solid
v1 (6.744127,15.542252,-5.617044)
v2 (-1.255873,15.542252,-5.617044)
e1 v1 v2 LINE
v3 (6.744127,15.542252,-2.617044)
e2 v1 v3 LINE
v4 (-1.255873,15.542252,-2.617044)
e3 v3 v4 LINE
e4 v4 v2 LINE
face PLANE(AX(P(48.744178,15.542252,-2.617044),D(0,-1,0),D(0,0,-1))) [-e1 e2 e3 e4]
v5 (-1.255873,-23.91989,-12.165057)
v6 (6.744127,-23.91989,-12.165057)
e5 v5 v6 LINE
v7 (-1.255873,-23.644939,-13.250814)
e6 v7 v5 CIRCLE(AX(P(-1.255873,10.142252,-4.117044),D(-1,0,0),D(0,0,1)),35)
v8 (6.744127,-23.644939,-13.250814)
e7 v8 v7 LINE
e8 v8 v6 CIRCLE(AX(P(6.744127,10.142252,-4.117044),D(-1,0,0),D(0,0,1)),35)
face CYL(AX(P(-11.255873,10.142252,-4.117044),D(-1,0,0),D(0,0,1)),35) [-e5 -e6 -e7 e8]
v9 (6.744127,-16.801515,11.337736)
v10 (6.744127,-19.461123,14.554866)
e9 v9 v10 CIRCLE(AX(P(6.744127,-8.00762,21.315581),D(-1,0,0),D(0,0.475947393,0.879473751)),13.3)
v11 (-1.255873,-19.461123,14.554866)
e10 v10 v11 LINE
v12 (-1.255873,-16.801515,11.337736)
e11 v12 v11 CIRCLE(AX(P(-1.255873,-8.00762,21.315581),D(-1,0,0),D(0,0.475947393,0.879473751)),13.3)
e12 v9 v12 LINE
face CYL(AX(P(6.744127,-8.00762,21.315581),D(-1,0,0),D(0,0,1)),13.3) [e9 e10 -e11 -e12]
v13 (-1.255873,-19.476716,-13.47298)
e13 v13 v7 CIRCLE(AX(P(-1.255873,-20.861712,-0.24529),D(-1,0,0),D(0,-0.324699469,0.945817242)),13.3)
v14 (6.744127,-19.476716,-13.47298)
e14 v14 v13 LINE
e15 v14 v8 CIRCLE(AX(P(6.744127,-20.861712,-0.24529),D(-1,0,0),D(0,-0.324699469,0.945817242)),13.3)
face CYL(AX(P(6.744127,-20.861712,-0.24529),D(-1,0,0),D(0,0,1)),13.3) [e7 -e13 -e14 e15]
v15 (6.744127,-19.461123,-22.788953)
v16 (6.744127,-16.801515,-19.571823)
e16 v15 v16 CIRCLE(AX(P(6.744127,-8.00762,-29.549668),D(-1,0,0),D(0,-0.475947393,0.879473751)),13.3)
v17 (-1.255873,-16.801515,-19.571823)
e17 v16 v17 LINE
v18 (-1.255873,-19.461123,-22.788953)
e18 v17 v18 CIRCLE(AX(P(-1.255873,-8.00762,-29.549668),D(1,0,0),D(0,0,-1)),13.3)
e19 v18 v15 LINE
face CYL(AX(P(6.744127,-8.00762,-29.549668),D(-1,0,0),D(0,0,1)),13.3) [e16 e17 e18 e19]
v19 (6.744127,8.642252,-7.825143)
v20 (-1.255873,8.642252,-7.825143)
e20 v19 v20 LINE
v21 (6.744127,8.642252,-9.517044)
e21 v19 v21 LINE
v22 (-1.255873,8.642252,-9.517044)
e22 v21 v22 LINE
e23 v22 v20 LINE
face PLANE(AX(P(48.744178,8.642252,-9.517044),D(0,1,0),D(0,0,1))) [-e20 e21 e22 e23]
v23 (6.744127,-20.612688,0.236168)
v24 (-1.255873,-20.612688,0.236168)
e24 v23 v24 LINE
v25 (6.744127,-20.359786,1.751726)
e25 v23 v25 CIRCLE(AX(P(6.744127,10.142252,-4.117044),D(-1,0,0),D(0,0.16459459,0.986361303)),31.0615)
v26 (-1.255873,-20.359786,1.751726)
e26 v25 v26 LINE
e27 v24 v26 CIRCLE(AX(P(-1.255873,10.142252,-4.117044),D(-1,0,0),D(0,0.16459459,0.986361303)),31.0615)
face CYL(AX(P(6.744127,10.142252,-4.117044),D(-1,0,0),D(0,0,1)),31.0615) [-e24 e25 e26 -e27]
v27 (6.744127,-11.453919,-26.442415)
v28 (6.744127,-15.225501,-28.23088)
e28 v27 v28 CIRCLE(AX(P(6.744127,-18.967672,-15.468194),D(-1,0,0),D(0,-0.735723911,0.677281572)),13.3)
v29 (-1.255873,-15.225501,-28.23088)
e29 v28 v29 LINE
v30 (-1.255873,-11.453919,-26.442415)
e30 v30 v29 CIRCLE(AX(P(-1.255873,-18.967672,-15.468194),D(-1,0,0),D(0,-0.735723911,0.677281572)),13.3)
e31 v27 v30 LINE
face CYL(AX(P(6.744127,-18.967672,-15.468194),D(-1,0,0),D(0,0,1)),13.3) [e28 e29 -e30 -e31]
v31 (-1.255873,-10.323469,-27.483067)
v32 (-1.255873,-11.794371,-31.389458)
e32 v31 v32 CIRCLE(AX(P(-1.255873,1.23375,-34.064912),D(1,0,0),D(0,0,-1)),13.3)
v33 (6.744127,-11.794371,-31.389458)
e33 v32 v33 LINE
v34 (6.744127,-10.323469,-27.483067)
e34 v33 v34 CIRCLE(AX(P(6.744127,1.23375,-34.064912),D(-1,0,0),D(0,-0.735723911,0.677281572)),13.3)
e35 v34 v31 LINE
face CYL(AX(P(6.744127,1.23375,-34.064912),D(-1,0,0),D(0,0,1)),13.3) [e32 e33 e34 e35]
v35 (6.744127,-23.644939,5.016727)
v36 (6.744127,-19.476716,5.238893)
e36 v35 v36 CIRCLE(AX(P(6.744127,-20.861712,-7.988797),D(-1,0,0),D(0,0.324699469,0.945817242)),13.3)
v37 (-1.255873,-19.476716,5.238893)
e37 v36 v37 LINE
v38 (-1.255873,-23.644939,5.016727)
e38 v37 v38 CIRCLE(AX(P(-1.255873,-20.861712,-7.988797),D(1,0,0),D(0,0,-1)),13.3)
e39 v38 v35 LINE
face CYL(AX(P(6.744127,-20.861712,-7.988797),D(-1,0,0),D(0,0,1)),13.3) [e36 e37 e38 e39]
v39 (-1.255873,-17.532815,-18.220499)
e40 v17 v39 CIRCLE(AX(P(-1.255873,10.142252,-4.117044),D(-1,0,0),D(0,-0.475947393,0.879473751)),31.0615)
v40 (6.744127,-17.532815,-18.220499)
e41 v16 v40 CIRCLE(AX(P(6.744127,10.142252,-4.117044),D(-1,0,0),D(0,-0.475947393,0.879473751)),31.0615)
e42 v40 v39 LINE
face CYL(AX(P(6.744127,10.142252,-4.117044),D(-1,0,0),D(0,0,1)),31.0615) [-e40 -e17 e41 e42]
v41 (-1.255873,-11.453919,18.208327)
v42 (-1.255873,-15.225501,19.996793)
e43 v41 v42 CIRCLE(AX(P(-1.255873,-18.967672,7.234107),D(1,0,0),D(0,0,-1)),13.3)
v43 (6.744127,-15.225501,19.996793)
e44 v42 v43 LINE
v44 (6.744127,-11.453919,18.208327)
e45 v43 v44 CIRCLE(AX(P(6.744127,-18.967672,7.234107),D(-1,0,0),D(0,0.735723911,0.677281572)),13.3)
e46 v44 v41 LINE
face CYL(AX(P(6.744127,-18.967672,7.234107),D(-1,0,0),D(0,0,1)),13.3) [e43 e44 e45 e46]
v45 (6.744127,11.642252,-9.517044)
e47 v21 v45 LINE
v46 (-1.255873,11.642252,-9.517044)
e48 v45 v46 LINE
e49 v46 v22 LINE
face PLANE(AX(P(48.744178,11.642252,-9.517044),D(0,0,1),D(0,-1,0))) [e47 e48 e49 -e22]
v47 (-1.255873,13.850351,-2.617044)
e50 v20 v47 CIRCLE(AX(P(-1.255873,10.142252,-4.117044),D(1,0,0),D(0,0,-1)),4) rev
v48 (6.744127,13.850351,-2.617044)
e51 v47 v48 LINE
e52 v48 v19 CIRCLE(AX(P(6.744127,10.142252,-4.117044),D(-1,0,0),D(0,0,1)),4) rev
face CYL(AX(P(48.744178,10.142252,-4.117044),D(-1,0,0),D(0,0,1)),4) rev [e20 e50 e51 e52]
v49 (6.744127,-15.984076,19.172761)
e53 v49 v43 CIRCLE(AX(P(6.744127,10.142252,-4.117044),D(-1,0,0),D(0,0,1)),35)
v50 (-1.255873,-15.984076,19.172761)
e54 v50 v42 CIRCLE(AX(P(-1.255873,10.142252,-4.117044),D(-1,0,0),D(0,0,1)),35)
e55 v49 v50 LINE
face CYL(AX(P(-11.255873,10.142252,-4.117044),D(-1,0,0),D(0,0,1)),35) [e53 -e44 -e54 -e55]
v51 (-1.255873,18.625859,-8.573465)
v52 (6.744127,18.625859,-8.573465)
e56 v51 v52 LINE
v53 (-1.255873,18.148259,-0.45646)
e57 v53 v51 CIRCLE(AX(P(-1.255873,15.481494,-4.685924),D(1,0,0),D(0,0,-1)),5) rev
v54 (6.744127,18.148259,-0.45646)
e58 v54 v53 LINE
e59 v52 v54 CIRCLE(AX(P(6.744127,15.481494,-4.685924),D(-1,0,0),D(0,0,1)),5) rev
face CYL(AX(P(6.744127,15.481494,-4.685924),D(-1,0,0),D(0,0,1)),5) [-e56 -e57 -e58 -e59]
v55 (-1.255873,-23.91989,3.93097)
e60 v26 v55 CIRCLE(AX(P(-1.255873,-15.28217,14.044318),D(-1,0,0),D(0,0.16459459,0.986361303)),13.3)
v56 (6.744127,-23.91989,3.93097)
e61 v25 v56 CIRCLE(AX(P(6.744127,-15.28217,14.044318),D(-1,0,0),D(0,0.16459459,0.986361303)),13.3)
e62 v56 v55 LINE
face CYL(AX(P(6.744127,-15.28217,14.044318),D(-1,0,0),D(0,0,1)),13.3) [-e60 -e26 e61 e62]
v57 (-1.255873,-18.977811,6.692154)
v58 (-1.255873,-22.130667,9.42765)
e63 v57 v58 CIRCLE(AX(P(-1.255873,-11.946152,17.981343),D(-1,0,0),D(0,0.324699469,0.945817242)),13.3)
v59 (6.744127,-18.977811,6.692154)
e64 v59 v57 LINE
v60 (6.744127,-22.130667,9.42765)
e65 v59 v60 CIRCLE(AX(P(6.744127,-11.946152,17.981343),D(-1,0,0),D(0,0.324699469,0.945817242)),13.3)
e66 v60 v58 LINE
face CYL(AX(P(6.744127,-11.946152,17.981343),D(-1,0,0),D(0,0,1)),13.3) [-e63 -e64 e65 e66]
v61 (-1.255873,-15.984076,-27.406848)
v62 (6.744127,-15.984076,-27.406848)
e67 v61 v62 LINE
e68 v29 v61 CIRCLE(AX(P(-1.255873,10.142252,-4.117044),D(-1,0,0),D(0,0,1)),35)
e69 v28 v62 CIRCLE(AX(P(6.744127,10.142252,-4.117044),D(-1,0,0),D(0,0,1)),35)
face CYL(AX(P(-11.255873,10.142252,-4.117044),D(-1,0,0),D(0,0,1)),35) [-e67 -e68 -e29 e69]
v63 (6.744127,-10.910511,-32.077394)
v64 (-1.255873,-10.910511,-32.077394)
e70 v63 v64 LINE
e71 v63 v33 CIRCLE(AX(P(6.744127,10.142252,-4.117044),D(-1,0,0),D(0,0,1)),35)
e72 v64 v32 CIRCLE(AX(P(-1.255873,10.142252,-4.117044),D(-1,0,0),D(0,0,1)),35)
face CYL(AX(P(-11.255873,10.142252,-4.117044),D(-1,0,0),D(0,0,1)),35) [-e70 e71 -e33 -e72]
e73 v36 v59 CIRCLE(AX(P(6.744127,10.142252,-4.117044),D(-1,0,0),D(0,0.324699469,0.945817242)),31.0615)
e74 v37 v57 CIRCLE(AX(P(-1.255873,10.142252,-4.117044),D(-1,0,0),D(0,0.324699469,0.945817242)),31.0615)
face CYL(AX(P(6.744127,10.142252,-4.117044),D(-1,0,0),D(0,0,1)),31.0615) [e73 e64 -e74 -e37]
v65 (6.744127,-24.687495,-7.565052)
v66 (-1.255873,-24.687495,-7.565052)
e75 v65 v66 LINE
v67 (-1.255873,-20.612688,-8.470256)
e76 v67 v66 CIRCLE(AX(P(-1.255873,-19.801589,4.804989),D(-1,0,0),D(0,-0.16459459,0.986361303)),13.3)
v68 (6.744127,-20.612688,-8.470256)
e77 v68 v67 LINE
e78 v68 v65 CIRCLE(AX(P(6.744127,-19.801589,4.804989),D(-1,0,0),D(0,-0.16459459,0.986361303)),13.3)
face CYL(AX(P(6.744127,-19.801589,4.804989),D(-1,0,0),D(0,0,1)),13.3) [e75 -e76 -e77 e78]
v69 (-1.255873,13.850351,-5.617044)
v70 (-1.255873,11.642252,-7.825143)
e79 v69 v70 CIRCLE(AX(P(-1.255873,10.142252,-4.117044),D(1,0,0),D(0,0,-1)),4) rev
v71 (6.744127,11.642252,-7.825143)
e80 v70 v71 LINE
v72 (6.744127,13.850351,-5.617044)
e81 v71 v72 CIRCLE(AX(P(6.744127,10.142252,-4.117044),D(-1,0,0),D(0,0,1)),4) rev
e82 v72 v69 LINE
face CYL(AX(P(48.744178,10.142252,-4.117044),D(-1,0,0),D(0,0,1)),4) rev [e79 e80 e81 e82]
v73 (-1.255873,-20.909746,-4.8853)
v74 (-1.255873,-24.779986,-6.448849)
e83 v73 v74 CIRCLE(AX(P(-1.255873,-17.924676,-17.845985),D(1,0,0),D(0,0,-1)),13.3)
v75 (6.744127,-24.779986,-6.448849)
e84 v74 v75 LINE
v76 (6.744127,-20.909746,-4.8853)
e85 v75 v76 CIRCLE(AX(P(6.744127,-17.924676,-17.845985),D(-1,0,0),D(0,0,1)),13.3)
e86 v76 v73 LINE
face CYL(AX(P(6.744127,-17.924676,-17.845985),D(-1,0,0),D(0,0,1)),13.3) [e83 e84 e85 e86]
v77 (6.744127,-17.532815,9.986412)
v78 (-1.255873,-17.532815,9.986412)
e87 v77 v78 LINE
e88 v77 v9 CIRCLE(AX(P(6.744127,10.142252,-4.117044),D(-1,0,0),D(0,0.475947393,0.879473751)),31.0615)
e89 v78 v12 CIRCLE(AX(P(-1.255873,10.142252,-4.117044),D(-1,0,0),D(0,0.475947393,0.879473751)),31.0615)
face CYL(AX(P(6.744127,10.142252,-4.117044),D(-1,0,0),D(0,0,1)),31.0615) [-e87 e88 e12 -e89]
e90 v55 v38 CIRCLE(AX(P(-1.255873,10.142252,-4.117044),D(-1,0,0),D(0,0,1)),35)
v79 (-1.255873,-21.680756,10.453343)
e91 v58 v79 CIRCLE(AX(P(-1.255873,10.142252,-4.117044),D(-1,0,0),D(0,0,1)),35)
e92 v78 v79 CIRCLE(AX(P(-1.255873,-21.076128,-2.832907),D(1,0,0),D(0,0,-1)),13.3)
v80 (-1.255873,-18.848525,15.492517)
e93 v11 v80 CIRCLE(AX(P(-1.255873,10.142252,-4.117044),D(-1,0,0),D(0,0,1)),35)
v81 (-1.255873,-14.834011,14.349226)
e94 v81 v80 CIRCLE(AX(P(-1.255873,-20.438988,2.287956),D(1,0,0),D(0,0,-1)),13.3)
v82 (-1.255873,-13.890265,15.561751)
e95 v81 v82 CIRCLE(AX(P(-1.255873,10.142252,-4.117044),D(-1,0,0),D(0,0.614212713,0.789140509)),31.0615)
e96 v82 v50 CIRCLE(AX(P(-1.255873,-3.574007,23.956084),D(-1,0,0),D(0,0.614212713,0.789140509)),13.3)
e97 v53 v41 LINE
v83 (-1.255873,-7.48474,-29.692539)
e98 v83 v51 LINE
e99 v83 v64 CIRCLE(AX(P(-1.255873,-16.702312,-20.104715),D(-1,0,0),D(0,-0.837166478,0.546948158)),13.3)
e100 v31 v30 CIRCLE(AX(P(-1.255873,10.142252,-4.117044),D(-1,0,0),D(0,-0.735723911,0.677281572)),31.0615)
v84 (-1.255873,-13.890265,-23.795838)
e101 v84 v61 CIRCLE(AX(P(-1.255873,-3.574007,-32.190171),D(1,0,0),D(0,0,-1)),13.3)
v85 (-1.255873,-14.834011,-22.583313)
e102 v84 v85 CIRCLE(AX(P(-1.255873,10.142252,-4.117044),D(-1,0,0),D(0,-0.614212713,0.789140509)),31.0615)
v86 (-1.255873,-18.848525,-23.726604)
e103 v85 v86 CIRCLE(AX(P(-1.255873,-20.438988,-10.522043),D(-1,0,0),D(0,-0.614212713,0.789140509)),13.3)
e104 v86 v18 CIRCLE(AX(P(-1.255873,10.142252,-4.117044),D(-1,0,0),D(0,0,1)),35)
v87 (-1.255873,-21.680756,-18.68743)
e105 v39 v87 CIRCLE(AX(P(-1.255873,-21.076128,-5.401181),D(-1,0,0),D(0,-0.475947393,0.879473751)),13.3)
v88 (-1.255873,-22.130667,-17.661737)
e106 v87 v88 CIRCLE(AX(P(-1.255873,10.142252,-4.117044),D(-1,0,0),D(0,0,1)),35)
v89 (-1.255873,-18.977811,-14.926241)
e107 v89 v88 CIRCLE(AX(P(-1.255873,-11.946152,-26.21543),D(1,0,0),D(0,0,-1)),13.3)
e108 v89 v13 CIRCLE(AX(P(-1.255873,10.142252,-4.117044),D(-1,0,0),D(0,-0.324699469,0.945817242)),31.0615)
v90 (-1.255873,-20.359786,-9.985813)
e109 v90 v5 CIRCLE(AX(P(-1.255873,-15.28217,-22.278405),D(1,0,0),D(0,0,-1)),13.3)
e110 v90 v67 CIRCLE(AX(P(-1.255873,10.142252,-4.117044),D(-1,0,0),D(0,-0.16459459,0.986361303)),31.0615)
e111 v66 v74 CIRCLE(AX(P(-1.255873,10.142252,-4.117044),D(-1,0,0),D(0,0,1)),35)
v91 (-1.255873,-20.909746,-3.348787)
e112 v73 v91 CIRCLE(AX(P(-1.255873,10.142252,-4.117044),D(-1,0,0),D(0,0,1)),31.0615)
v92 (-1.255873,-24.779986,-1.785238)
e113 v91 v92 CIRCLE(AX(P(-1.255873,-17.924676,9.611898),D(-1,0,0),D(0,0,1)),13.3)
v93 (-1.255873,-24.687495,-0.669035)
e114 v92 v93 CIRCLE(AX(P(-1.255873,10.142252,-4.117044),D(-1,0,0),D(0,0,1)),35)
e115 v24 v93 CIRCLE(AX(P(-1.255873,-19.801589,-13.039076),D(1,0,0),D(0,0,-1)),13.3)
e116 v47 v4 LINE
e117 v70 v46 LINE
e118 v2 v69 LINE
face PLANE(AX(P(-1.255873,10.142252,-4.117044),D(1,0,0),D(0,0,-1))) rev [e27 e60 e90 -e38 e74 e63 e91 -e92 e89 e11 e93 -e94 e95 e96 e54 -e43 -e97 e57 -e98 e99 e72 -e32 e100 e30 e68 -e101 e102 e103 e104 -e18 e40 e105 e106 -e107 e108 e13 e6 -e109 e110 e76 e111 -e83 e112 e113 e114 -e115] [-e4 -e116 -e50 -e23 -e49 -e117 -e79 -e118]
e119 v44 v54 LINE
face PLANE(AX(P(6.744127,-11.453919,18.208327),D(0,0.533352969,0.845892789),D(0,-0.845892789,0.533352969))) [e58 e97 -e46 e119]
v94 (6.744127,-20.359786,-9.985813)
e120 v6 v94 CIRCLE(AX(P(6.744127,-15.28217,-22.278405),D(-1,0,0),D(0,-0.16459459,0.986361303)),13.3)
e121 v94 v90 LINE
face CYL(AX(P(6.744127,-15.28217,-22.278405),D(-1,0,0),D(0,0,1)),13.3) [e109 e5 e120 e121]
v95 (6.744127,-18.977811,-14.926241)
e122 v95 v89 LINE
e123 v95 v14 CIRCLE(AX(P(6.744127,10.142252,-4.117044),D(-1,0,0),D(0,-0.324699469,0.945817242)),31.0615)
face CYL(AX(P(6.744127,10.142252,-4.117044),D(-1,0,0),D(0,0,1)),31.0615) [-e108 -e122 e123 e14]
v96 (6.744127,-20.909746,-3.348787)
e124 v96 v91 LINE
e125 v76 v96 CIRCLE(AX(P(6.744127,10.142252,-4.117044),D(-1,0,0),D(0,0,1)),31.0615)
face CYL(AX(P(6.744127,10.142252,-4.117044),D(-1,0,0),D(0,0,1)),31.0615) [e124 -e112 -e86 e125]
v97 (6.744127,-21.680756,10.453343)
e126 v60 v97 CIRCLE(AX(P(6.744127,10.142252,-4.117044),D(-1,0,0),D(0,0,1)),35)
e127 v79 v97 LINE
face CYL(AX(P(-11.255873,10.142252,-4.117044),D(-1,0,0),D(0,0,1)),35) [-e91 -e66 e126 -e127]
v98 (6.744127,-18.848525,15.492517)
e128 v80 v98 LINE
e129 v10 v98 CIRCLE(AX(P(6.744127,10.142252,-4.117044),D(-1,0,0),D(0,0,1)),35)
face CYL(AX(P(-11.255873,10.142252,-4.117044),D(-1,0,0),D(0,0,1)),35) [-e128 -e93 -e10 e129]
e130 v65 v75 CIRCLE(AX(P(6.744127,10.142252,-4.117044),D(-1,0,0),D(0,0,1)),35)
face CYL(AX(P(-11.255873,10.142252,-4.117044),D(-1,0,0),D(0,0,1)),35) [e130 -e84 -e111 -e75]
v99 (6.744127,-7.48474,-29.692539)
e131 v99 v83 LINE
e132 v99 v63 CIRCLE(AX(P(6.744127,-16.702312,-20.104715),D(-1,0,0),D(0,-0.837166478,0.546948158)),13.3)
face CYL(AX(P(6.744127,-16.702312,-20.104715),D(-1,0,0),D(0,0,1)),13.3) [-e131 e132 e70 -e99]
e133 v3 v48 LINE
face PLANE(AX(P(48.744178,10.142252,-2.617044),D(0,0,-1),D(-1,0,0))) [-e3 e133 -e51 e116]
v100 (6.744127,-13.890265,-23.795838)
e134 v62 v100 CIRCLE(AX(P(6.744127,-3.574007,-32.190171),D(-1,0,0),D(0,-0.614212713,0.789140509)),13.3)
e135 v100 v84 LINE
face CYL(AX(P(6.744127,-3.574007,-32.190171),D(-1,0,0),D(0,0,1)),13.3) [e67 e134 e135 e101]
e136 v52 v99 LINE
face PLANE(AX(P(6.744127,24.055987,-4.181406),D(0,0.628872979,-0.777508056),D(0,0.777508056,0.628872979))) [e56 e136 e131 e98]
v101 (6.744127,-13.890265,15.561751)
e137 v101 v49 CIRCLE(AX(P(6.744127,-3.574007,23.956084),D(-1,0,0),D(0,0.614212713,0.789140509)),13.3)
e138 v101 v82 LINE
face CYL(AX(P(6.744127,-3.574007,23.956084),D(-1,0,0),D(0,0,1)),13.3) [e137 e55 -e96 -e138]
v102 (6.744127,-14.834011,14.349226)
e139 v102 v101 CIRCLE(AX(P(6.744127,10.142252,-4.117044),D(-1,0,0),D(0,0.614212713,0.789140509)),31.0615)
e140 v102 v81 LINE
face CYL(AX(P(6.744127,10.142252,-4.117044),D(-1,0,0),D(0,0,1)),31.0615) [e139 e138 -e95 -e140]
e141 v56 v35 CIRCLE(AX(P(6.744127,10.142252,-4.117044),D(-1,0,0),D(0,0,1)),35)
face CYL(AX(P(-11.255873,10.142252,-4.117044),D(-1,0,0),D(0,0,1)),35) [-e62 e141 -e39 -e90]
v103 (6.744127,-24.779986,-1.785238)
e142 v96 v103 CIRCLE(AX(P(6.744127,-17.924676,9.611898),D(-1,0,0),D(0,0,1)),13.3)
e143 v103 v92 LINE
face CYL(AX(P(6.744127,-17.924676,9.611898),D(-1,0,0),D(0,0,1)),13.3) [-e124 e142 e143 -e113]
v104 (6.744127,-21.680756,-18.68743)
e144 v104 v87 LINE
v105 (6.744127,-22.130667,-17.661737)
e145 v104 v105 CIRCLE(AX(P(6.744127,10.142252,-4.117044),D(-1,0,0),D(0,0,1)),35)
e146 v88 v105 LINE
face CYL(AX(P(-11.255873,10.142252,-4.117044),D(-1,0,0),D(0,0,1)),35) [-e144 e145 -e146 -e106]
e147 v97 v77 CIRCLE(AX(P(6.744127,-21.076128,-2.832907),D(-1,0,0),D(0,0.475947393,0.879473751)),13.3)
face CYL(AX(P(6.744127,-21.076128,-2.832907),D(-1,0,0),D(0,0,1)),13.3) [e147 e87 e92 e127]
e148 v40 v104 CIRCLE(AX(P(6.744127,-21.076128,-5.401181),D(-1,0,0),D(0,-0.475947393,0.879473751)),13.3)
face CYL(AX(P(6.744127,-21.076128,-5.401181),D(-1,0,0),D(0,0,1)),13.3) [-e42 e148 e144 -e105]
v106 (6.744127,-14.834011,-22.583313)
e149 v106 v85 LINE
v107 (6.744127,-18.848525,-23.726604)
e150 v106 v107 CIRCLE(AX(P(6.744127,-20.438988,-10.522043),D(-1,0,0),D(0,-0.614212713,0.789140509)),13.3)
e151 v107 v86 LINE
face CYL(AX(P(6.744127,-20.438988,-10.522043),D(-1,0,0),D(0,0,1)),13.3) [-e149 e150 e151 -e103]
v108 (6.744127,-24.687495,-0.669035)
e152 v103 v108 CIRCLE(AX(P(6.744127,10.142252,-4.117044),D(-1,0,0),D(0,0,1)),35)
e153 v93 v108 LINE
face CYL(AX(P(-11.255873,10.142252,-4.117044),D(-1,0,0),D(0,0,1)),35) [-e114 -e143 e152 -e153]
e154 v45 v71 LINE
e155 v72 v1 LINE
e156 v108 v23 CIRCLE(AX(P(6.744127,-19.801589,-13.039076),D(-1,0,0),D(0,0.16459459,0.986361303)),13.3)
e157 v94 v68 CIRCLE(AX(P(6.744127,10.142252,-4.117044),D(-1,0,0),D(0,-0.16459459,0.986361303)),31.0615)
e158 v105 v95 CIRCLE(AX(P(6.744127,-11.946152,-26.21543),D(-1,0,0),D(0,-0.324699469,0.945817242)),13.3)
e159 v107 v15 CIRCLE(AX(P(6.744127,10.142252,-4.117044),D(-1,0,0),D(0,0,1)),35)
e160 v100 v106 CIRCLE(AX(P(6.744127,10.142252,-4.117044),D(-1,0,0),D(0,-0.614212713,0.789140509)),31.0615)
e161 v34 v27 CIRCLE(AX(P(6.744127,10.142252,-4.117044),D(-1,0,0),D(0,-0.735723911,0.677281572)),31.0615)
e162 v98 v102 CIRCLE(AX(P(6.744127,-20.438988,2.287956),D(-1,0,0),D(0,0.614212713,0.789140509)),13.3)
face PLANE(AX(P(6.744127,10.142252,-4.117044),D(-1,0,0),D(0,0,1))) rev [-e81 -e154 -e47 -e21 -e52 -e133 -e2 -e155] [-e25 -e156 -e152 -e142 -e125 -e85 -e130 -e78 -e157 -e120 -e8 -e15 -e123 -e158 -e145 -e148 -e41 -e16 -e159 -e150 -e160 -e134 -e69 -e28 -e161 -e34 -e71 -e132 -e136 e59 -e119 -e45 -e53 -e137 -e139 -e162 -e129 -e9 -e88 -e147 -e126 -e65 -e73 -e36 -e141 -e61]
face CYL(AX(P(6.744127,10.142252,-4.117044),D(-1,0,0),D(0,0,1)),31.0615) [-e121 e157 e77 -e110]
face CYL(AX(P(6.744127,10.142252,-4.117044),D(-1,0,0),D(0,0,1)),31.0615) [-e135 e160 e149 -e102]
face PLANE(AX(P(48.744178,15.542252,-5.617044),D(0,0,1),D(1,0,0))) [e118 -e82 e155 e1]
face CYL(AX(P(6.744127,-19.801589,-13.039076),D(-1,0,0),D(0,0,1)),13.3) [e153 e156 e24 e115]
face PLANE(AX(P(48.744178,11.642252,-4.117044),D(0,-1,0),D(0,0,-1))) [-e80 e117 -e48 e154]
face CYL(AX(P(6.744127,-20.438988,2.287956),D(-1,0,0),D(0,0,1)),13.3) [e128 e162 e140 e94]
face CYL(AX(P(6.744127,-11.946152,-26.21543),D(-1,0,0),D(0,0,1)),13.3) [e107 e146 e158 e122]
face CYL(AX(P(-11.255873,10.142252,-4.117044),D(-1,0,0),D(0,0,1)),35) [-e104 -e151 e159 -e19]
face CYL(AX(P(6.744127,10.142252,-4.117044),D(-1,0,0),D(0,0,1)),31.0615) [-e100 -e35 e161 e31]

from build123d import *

# Parameters (mm, degrees)
SPUR_START          = -1.255872891
SPUR_GEAR_ISO_DEPTH = 8
CUT_EXTRUDE1_START  = -8
CUT_EXTRUDE1_DEPTH  = 8
FILLET1_R           = 5


# Read off the part's stored shape, not the designer's step: spur gear_iso
with BuildPart() as part:
    # spur gear_iso outline → spur gear_iso (new body)
    with BuildSketch(Plane.YZ.offset(SPUR_START)):
        with BuildLine():
            ThreePointArc((10.70226618, 30.878475903), (10.142251627, 30.882956422), (9.582237074, 30.878475903))
            ThreePointArc((9.582237074, 30.878475903), (8.805580488, 28.934301135), (8.343630809, 26.892337993))
            ThreePointArc((8.343630809, 26.892337993), (7.577213288, 26.838365652), (6.812365147, 26.765453703))
            ThreePointArc((6.812365147, 26.765453703), (6.020619773, 28.703532711), (4.934555121, 30.493357996))
            ThreePointArc((4.934555121, 30.493357996), (4.381440967, 30.405602041), (3.829801752, 30.309007264))
            ThreePointArc((3.829801752, 30.309007264), (3.383738399, 28.263515034), (3.264185198, 26.17336719))
            ThreePointArc((3.264185198, 26.17336719), (2.517104168, 25.993982783), (1.774688472, 25.796175391))
            ThreePointArc((1.774688472, 25.796175391), (0.674744152, 27.577504522), (-0.691103553, 29.164158557))
            ThreePointArc((-0.691103553, 29.164158557), (-1.222229795, 28.986559882), (-1.750446392, 28.800485701))
            ThreePointArc((-1.750446392, 28.800485701), (-1.853749067, 26.709471704), (-1.62764469, 24.628152942))
            ThreePointArc((-1.62764469, 24.628152942), (-2.335010805, 24.328249608), (-3.034742893, 24.010942444))
            ThreePointArc((-3.034742893, 24.010942444), (-4.412882545, 25.586931683), (-6.021256538, 26.927134682))
            ThreePointArc((-6.021256538, 26.927134682), (-6.515907129, 26.664537715), (-7.006292737, 26.394059749))
            ThreePointArc((-7.006292737, 26.394059749), (-6.764016906, 24.314561396), (-6.198422489, 22.298844666))
            ThreePointArc((-6.198422489, 22.298844666), (-6.846778586, 21.886602987), (-7.484740198, 21.458451363))
            ThreePointArc((-7.484740198, 21.458451363), (-9.103483124, 22.786111831), (-10.910511155, 23.843306549))
            ThreePointArc((-10.910511155, 23.843306549), (-11.355193317, 23.502874251), (-11.794371494, 23.155370434))
            ThreePointArc((-11.794371494, 23.155370434), (-11.21312581, 21.144111019), (-10.323469295, 19.24897982))
            ThreePointArc((-10.323469295, 19.24897982), (-10.89512991, 18.735644674), (-11.453919115, 18.20832745))
            ThreePointArc((-11.453919115, 18.20832745), (-13.269110228, 19.251444031), (-15.225501284, 19.996792953))
            ThreePointArc((-15.225501284, 19.996792953), (-15.608085246, 19.587811429), (-15.984076358, 19.172760759))
            ThreePointArc((-15.984076358, 19.172760759), (-15.079715688, 17.284602196), (-13.890264584, 15.561750766))
            ThreePointArc((-13.890264584, 15.561750766), (-14.369636305, 14.961324598), (-14.834010792, 14.349225613))
            ThreePointArc((-14.834010792, 14.349225613), (-16.796136411, 15.079344806), (-18.848525243, 15.492516756))
            ThreePointArc((-18.848525243, 15.492516756), (-19.158575112, 15.026141957), (-19.461123099, 14.554865934))
            ThreePointArc((-19.461123099, 14.554865934), (-18.258316045, 12.841312267), (-16.801515479, 11.337735501))
            ThreePointArc((-16.801515479, 11.337735501), (-17.175522296, 10.666596371), (-17.532815138, 9.98641209))
            ThreePointArc((-17.532815138, 9.98641209), (-19.58835359, 10.383618147), (-21.680756382, 10.453342871))
            ThreePointArc((-21.680756382, 10.453342871), (-21.909814806, 9.942296285), (-22.130666949, 9.427650091))
            ThreePointArc((-22.130666949, 9.427650091), (-20.662222952, 7.935442597), (-18.977810645, 6.692154151))
            ThreePointArc((-18.977810645, 6.692154151), (-19.236250626, 5.968608985), (-19.476715807, 5.238893062))
            ThreePointArc((-19.476715807, 5.238893062), (-21.569597361, 5.292351237), (-23.644938818, 5.016726826))
            ThreePointArc((-23.644938818, 5.016726826), (-23.786757681, 4.474948472), (-23.919889709, 3.930970313))
            ThreePointArc((-23.919889709, 3.930970313), (-22.225864093, 2.700812522), (-20.359786422, 1.751726064))
            ThreePointArc((-20.359786422, 1.751726064), (-20.495609998, 0.995511288), (-20.612688254, 0.236168472))
            ThreePointArc((-20.612688254, 0.236168472), (-22.685824559, -0.055579435), (-24.687494776, -0.669034665))
            ThreePointArc((-24.687494776, -0.669034665), (-24.738205628, -1.226766486), (-24.779986047, -1.785238304))
            ThreePointArc((-24.779986047, -1.785238304), (-22.906587414, -2.719790893), (-20.909746114, -3.34878676))
            ThreePointArc((-20.909746114, -3.34878676), (-20.919248373, -4.117043577), (-20.909746114, -4.885300395))
            ThreePointArc((-20.909746114, -4.885300395), (-22.906587414, -5.514296262), (-24.779986047, -6.448848851))
            ThreePointArc((-24.779986047, -6.448848851), (-24.738205628, -7.007320669), (-24.687494776, -7.56505249))
            ThreePointArc((-24.687494776, -7.56505249), (-22.685824559, -8.17850772), (-20.612688254, -8.470255627))
            ThreePointArc((-20.612688254, -8.470255627), (-20.495609998, -9.229598443), (-20.359786422, -9.985813219))
            ThreePointArc((-20.359786422, -9.985813219), (-22.225864092, -10.934899678), (-23.919889709, -12.165057468))
            ThreePointArc((-23.919889709, -12.165057468), (-23.786757681, -12.709035628), (-23.644938818, -13.250813982))
            ThreePointArc((-23.644938818, -13.250813982), (-21.569597361, -13.526438392), (-19.476715807, -13.472980218))
            ThreePointArc((-19.476715807, -13.472980218), (-19.236250626, -14.20269614), (-18.977810645, -14.926241306))
            ThreePointArc((-18.977810645, -14.926241306), (-20.662222952, -16.169529752), (-22.130666949, -17.661737246))
            ThreePointArc((-22.130666949, -17.661737246), (-21.909814806, -18.17638344), (-21.680756382, -18.687430026))
            ThreePointArc((-21.680756382, -18.687430026), (-19.58835359, -18.617705303), (-17.532815138, -18.220499246))
            ThreePointArc((-17.532815138, -18.220499246), (-17.175522296, -18.900683526), (-16.801515479, -19.571822656))
            ThreePointArc((-16.801515479, -19.571822656), (-18.258316045, -21.075399422), (-19.461123099, -22.788953089))
            ThreePointArc((-19.461123099, -22.788953089), (-19.158575112, -23.260229112), (-18.848525243, -23.726603911))
            ThreePointArc((-18.848525243, -23.726603911), (-16.79613641, -23.313431962), (-14.834010792, -22.583312768))
            ThreePointArc((-14.834010792, -22.583312768), (-14.369636305, -23.195411753), (-13.890264584, -23.795837921))
            ThreePointArc((-13.890264584, -23.795837921), (-15.079715688, -25.518689351), (-15.984076358, -27.406847914))
            ThreePointArc((-15.984076358, -27.406847914), (-15.608085247, -27.821898584), (-15.225501284, -28.230880108))
            ThreePointArc((-15.225501284, -28.230880108), (-13.269110228, -27.485531187), (-11.453919115, -26.442414605))
            ThreePointArc((-11.453919115, -26.442414605), (-10.89512991, -26.969731829), (-10.323469295, -27.483066975))
            ThreePointArc((-10.323469295, -27.483066975), (-11.21312581, -29.378198174), (-11.794371494, -31.389457589))
            ThreePointArc((-11.794371494, -31.389457589), (-11.355193317, -31.736961407), (-10.910511155, -32.077393705))
            ThreePointArc((-10.910511155, -32.077393705), (-9.103483124, -31.020198987), (-7.484740198, -29.692538518))
            ThreePointArc((-7.484740198, -29.692538518), (-6.846778586, -30.120690142), (-6.198422489, -30.532931821))
            ThreePointArc((-6.198422489, -30.532931821), (-6.764016906, -32.548648551), (-7.006292737, -34.628146904))
            ThreePointArc((-7.006292737, -34.628146904), (-6.515907129, -34.89862487), (-6.021256538, -35.161221837))
            ThreePointArc((-6.021256538, -35.161221837), (-4.412882545, -33.821018838), (-3.034742893, -32.2450296))
            ThreePointArc((-3.034742893, -32.2450296), (-2.335010806, -32.562336764), (-1.62764469, -32.862240097))
            ThreePointArc((-1.62764469, -32.862240097), (-1.853749067, -34.943558859), (-1.750446392, -37.034572856))
            ThreePointArc((-1.750446392, -37.034572856), (-1.222229795, -37.220647037), (-0.691103553, -37.398245713))
            ThreePointArc((-0.691103553, -37.398245713), (0.674744152, -35.811591678), (1.774688472, -34.030262547))
            ThreePointArc((1.774688472, -34.030262547), (2.517104168, -34.228069938), (3.264185198, -34.407454345))
            ThreePointArc((3.264185198, -34.407454345), (3.383738399, -36.49760219), (3.829801752, -38.54309442))
            ThreePointArc((3.829801752, -38.54309442), (4.381440967, -38.639689197), (4.934555121, -38.727445151))
            ThreePointArc((4.934555121, -38.727445151), (6.020619773, -36.937619866), (6.812365147, -34.999540858))
            ThreePointArc((6.812365147, -34.999540858), (7.577213288, -35.072452807), (8.343630809, -35.126425148))
            ThreePointArc((8.343630809, -35.126425148), (8.805580488, -37.16838829), (9.582237074, -39.112563058))
            ThreePointArc((9.582237074, -39.112563058), (10.142251627, -39.117043578), (10.70226618, -39.112563058))
            ThreePointArc((10.70226618, -39.112563058), (11.478922766, -37.16838829), (11.940872445, -35.126425148))
            ThreePointArc((11.940872445, -35.126425148), (12.707289966, -35.072452807), (13.472138107, -34.999540858))
            ThreePointArc((13.472138107, -34.999540858), (14.263883482, -36.937619866), (15.349948133, -38.727445151))
            ThreePointArc((15.349948133, -38.727445151), (15.903062287, -38.639689197), (16.454701502, -38.54309442))
            ThreePointArc((16.454701502, -38.54309442), (16.900764855, -36.49760219), (17.020318056, -34.407454345))
            ThreePointArc((17.020318056, -34.407454345), (17.767399086, -34.228069938), (18.509814783, -34.030262547))
            ThreePointArc((18.509814783, -34.030262547), (19.609759102, -35.811591678), (20.975606807, -37.398245713))
            ThreePointArc((20.975606807, -37.398245713), (21.506733049, -37.220647037), (22.034949647, -37.034572856))
            ThreePointArc((22.034949647, -37.034572856), (22.138252321, -34.943558859), (21.912147944, -32.862240097))
            ThreePointArc((21.912147944, -32.862240097), (22.61951406, -32.562336764), (23.319246148, -32.2450296))
            ThreePointArc((23.319246148, -32.2450296), (24.697385799, -33.821018838), (26.305759792, -35.161221837))
            ThreePointArc((26.305759792, -35.161221837), (26.800410383, -34.89862487), (27.290795991, -34.628146904))
            ThreePointArc((27.290795991, -34.628146904), (27.04852016, -32.548648551), (26.482925743, -30.532931821))
            ThreePointArc((26.482925743, -30.532931821), (27.131281841, -30.120690142), (27.769243452, -29.692538518))
            ThreePointArc((27.769243452, -29.692538518), (29.387986378, -31.020198987), (31.19501441, -32.077393705))
            ThreePointArc((31.19501441, -32.077393705), (31.639696572, -31.736961407), (32.078874749, -31.389457589))
            ThreePointArc((32.078874749, -31.389457589), (31.497629065, -29.378198174), (30.607972549, -27.483066975))
            ThreePointArc((30.607972549, -27.483066975), (31.179633164, -26.969731829), (31.73842237, -26.442414605))
            ThreePointArc((31.73842237, -26.442414605), (33.553613483, -27.485531187), (35.510004539, -28.230880108))
            ThreePointArc((35.510004539, -28.230880108), (35.892588501, -27.821898585), (36.268579612, -27.406847914))
            ThreePointArc((36.268579612, -27.406847914), (35.364218942, -25.518689351), (34.174767838, -23.795837921))
            ThreePointArc((34.174767838, -23.795837921), (34.65413956, -23.195411753), (35.118514046, -22.583312768))
            ThreePointArc((35.118514046, -22.583312768), (37.080639664, -23.313431962), (39.133028497, -23.726603911))
            ThreePointArc((39.133028497, -23.726603911), (39.443078366, -23.260229112), (39.745626354, -22.788953089))
            ThreePointArc((39.745626354, -22.788953089), (38.5428193, -21.075399422), (37.086018733, -19.571822656))
            ThreePointArc((37.086018733, -19.571822656), (37.46002555, -18.900683526), (37.817318393, -18.220499246))
            ThreePointArc((37.817318393, -18.220499246), (39.872856845, -18.617705303), (41.965259636, -18.687430026))
            ThreePointArc((41.965259636, -18.687430026), (42.19431806, -18.17638344), (42.415170203, -17.661737246))
            ThreePointArc((42.415170203, -17.661737246), (40.946726206, -16.169529752), (39.262313899, -14.926241306))
            ThreePointArc((39.262313899, -14.926241306), (39.52075388, -14.20269614), (39.761219061, -13.472980218))
            ThreePointArc((39.761219061, -13.472980218), (41.854100616, -13.526438392), (43.929442073, -13.250813982))
            ThreePointArc((43.929442073, -13.250813982), (44.071260935, -12.709035628), (44.204392963, -12.165057468))
            ThreePointArc((44.204392963, -12.165057468), (42.510367346, -10.934899678), (40.644289676, -9.985813219))
            ThreePointArc((40.644289676, -9.985813219), (40.780113253, -9.229598444), (40.897191508, -8.470255627))
            ThreePointArc((40.897191508, -8.470255627), (42.970327813, -8.17850772), (44.971998031, -7.56505249))
            ThreePointArc((44.971998031, -7.56505249), (45.022708882, -7.007320669), (45.064489301, -6.448848851))
            ThreePointArc((45.064489301, -6.448848851), (43.191090668, -5.514296262), (41.194249368, -4.885300395))
            ThreePointArc((41.194249368, -4.885300395), (41.203751627, -4.117043577), (41.194249368, -3.34878676))
            ThreePointArc((41.194249368, -3.34878676), (43.191090668, -2.719790893), (45.064489301, -1.785238304))
            ThreePointArc((45.064489301, -1.785238304), (45.022708882, -1.226766486), (44.971998031, -0.669034665))
            ThreePointArc((44.971998031, -0.669034665), (42.970327813, -0.055579435), (40.897191508, 0.236168472))
            ThreePointArc((40.897191508, 0.236168472), (40.780113253, 0.995511288), (40.644289676, 1.751726064))
            ThreePointArc((40.644289676, 1.751726064), (42.510367347, 2.700812522), (44.204392963, 3.930970313))
            ThreePointArc((44.204392963, 3.930970313), (44.071260935, 4.474948472), (43.929442073, 5.016726826))
            ThreePointArc((43.929442073, 5.016726826), (41.854100616, 5.292351237), (39.761219061, 5.238893062))
            ThreePointArc((39.761219061, 5.238893062), (39.52075388, 5.968608985), (39.262313899, 6.692154151))
            ThreePointArc((39.262313899, 6.692154151), (40.946726206, 7.935442597), (42.415170203, 9.427650091))
            ThreePointArc((42.415170203, 9.427650091), (42.19431806, 9.942296285), (41.965259636, 10.453342871))
            ThreePointArc((41.965259636, 10.453342871), (39.872856845, 10.383618147), (37.817318393, 9.98641209))
            ThreePointArc((37.817318393, 9.98641209), (37.46002555, 10.666596371), (37.086018733, 11.337735501))
            ThreePointArc((37.086018733, 11.337735501), (38.5428193, 12.841312267), (39.745626354, 14.554865934))
            ThreePointArc((39.745626354, 14.554865934), (39.443078366, 15.026141957), (39.133028497, 15.492516756))
            ThreePointArc((39.133028497, 15.492516756), (37.080639665, 15.079344806), (35.118514046, 14.349225613))
            ThreePointArc((35.118514046, 14.349225613), (34.65413956, 14.961324598), (34.174767838, 15.561750766))
            ThreePointArc((34.174767838, 15.561750766), (35.364218942, 17.284602196), (36.268579612, 19.172760759))
            ThreePointArc((36.268579612, 19.172760759), (35.892588501, 19.587811429), (35.510004539, 19.996792953))
            ThreePointArc((35.510004539, 19.996792953), (33.553613483, 19.251444031), (31.73842237, 18.20832745))
            ThreePointArc((31.73842237, 18.20832745), (31.179633164, 18.735644674), (30.607972549, 19.24897982))
            ThreePointArc((30.607972549, 19.24897982), (31.497629065, 21.144111019), (32.078874749, 23.155370434))
            ThreePointArc((32.078874749, 23.155370434), (31.639696571, 23.502874251), (31.19501441, 23.843306549))
            ThreePointArc((31.19501441, 23.843306549), (29.387986378, 22.786111831), (27.769243452, 21.458451363))
            ThreePointArc((27.769243452, 21.458451363), (27.131281841, 21.886602987), (26.482925743, 22.298844666))
            ThreePointArc((26.482925743, 22.298844666), (27.04852016, 24.314561396), (27.290795991, 26.394059749))
            ThreePointArc((27.290795991, 26.394059749), (26.800410383, 26.664537715), (26.305759792, 26.927134682))
            ThreePointArc((26.305759792, 26.927134682), (24.697385799, 25.586931683), (23.319246148, 24.010942444))
            ThreePointArc((23.319246148, 24.010942444), (22.61951406, 24.328249608), (21.912147944, 24.628152942))
            ThreePointArc((21.912147944, 24.628152942), (22.138252321, 26.709471704), (22.034949647, 28.800485701))
            ThreePointArc((22.034949647, 28.800485701), (21.506733049, 28.986559882), (20.975606807, 29.164158557))
            ThreePointArc((20.975606807, 29.164158557), (19.609759102, 27.577504522), (18.509814783, 25.796175391))
            ThreePointArc((18.509814783, 25.796175391), (17.767399086, 25.993982783), (17.020318056, 26.17336719))
            ThreePointArc((17.020318056, 26.17336719), (16.900764855, 28.263515034), (16.454701502, 30.309007264))
            ThreePointArc((16.454701502, 30.309007264), (15.903062287, 30.405602041), (15.349948133, 30.493357996))
            ThreePointArc((15.349948133, 30.493357996), (14.263883482, 28.703532711), (13.472138107, 26.765453703))
            ThreePointArc((13.472138107, 26.765453703), (12.707289966, 26.838365652), (11.940872445, 26.892337993))
            ThreePointArc((11.940872445, 26.892337993), (11.478922766, 28.934301135), (10.70226618, 30.878475903))
        make_face()
        with BuildLine():
            Line((8.642251627, -9.517043578), (8.642251627, -7.825142821))
            ThreePointArc((8.642251627, -7.825142821), (7.313824503, -1.288616452), (13.850350871, -2.617043578))
            Line((13.850350871, -2.617043578), (15.542251627, -2.617043578))
            Line((15.542251627, -2.617043578), (15.542251627, -5.617043578))
            Line((15.542251627, -5.617043578), (13.850350871, -5.617043578))
            ThreePointArc((13.850350871, -5.617043578), (12.970678752, -6.945470702), (11.642251627, -7.825142821))
            Line((11.642251627, -7.825142821), (11.642251627, -9.517043578))
            Line((11.642251627, -9.517043578), (8.642251627, -9.517043578))
        make_face(mode=Mode.SUBTRACT)
    extrude(amount=SPUR_GEAR_ISO_DEPTH)

    # Sketch1 → Cut-Extrude1 (cut)
    with BuildSketch(Plane(origin=(6.744127109, 0, 0), x_dir=(0, 0, -1), z_dir=(1, 0, 0)).offset(CUT_EXTRUDE1_START)):
        with BuildLine():
            ThreePointArc((-19.24897982, -10.323469295), (-18.735644674, -10.89512991), (-18.20832745, -11.453919115))
            Line((-18.20832745, -11.453919115), (4.181405833, 24.055987178))
            Line((4.181405833, 24.055987178), (29.692538518, -7.484740198))
            ThreePointArc((29.692538518, -7.484740198), (30.120690142, -6.846778586), (30.532931821, -6.198422489))
            ThreePointArc((30.532931821, -6.198422489), (32.548648551, -6.764016906), (34.628146904, -7.006292737))
            ThreePointArc((34.628146904, -7.006292737), (34.89862487, -6.515907129), (35.161221837, -6.021256538))
            ThreePointArc((35.161221837, -6.021256538), (33.821018838, -4.412882545), (32.2450296, -3.034742893))
            ThreePointArc((32.2450296, -3.034742893), (32.562336764, -2.335010806), (32.862240097, -1.62764469))
            ThreePointArc((32.862240097, -1.62764469), (34.943558859, -1.853749067), (37.034572856, -1.750446392))
            ThreePointArc((37.034572856, -1.750446392), (37.220647037, -1.222229795), (37.398245713, -0.691103553))
            ThreePointArc((37.398245713, -0.691103553), (35.811591678, 0.674744152), (34.030262547, 1.774688472))
            ThreePointArc((34.030262547, 1.774688472), (34.228069938, 2.517104168), (34.407454345, 3.264185198))
            ThreePointArc((34.407454345, 3.264185198), (36.49760219, 3.383738399), (38.54309442, 3.829801752))
            ThreePointArc((38.54309442, 3.829801752), (38.639689197, 4.381440967), (38.727445151, 4.934555121))
            ThreePointArc((38.727445151, 4.934555121), (36.937619866, 6.020619773), (34.999540858, 6.812365147))
            ThreePointArc((34.999540858, 6.812365147), (35.072452807, 7.577213288), (35.126425148, 8.343630809))
            ThreePointArc((35.126425148, 8.343630809), (37.16838829, 8.805580488), (39.112563058, 9.582237074))
            ThreePointArc((39.112563058, 9.582237074), (39.117043578, 10.142251627), (39.112563058, 10.70226618))
            ThreePointArc((39.112563058, 10.70226618), (37.16838829, 11.478922766), (35.126425148, 11.940872445))
            ThreePointArc((35.126425148, 11.940872445), (35.072452807, 12.707289966), (34.999540858, 13.472138107))
            ThreePointArc((34.999540858, 13.472138107), (36.937619866, 14.263883482), (38.727445151, 15.349948133))
            ThreePointArc((38.727445151, 15.349948133), (38.639689197, 15.903062287), (38.54309442, 16.454701502))
            ThreePointArc((38.54309442, 16.454701502), (36.49760219, 16.900764855), (34.407454345, 17.020318056))
            ThreePointArc((34.407454345, 17.020318056), (34.228069938, 17.767399086), (34.030262547, 18.509814783))
            ThreePointArc((34.030262547, 18.509814783), (35.811591678, 19.609759102), (37.398245713, 20.975606807))
            ThreePointArc((37.398245713, 20.975606807), (37.220647037, 21.506733049), (37.034572856, 22.034949647))
            ThreePointArc((37.034572856, 22.034949647), (34.943558859, 22.138252321), (32.862240097, 21.912147944))
            ThreePointArc((32.862240097, 21.912147944), (32.562336764, 22.61951406), (32.2450296, 23.319246148))
            ThreePointArc((32.2450296, 23.319246148), (33.821018838, 24.697385799), (35.161221837, 26.305759792))
            ThreePointArc((35.161221837, 26.305759792), (34.89862487, 26.800410383), (34.628146904, 27.290795991))
            ThreePointArc((34.628146904, 27.290795991), (32.548648551, 27.04852016), (30.532931821, 26.482925743))
            ThreePointArc((30.532931821, 26.482925743), (30.120690142, 27.131281841), (29.692538518, 27.769243452))
            ThreePointArc((29.692538518, 27.769243452), (31.020198987, 29.387986378), (32.077393705, 31.19501441))
            ThreePointArc((32.077393705, 31.19501441), (31.736961407, 31.639696572), (31.389457589, 32.078874749))
            ThreePointArc((31.389457589, 32.078874749), (29.378198174, 31.497629065), (27.483066975, 30.607972549))
            ThreePointArc((27.483066975, 30.607972549), (26.969731829, 31.179633164), (26.442414605, 31.73842237))
            ThreePointArc((26.442414605, 31.73842237), (27.485531187, 33.553613483), (28.230880108, 35.510004539))
            ThreePointArc((28.230880108, 35.510004539), (27.821898585, 35.892588501), (27.406847914, 36.268579612))
            ThreePointArc((27.406847914, 36.268579612), (25.518689351, 35.364218942), (23.795837921, 34.174767838))
            ThreePointArc((23.795837921, 34.174767838), (23.195411753, 34.65413956), (22.583312768, 35.118514046))
            ThreePointArc((22.583312768, 35.118514046), (23.313431962, 37.080639664), (23.726603911, 39.133028497))
            ThreePointArc((23.726603911, 39.133028497), (23.260229112, 39.443078366), (22.788953089, 39.745626354))
            ThreePointArc((22.788953089, 39.745626354), (21.075399422, 38.5428193), (19.571822656, 37.086018733))
            ThreePointArc((19.571822656, 37.086018733), (18.900683526, 37.46002555), (18.220499246, 37.817318393))
            ThreePointArc((18.220499246, 37.817318393), (18.617705303, 39.872856845), (18.687430026, 41.965259636))
            ThreePointArc((18.687430026, 41.965259636), (18.17638344, 42.19431806), (17.661737246, 42.415170203))
            ThreePointArc((17.661737246, 42.415170203), (16.169529752, 40.946726206), (14.926241306, 39.262313899))
            ThreePointArc((14.926241306, 39.262313899), (14.20269614, 39.52075388), (13.472980218, 39.761219061))
            ThreePointArc((13.472980218, 39.761219061), (13.526438392, 41.854100616), (13.250813982, 43.929442073))
            ThreePointArc((13.250813982, 43.929442073), (12.709035628, 44.071260935), (12.165057468, 44.204392963))
            ThreePointArc((12.165057468, 44.204392963), (10.934899678, 42.510367346), (9.985813219, 40.644289676))
            ThreePointArc((9.985813219, 40.644289676), (9.229598444, 40.780113253), (8.470255627, 40.897191508))
            ThreePointArc((8.470255627, 40.897191508), (8.17850772, 42.970327813), (7.56505249, 44.971998031))
            ThreePointArc((7.56505249, 44.971998031), (7.007320669, 45.022708882), (6.448848851, 45.064489301))
            ThreePointArc((6.448848851, 45.064489301), (5.514296262, 43.191090668), (4.885300395, 41.194249368))
            ThreePointArc((4.885300395, 41.194249368), (4.117043577, 41.203751627), (3.34878676, 41.194249368))
            ThreePointArc((3.34878676, 41.194249368), (2.719790893, 43.191090668), (1.785238304, 45.064489301))
            ThreePointArc((1.785238304, 45.064489301), (1.226766486, 45.022708882), (0.669034665, 44.971998031))
            ThreePointArc((0.669034665, 44.971998031), (0.055579435, 42.970327813), (-0.236168472, 40.897191508))
            ThreePointArc((-0.236168472, 40.897191508), (-0.995511288, 40.780113253), (-1.751726064, 40.644289676))
            ThreePointArc((-1.751726064, 40.644289676), (-2.700812522, 42.510367347), (-3.930970313, 44.204392963))
            ThreePointArc((-3.930970313, 44.204392963), (-4.474948472, 44.071260935), (-5.016726826, 43.929442073))
            ThreePointArc((-5.016726826, 43.929442073), (-5.292351237, 41.854100616), (-5.238893062, 39.761219061))
            ThreePointArc((-5.238893062, 39.761219061), (-5.968608985, 39.52075388), (-6.692154151, 39.262313899))
            ThreePointArc((-6.692154151, 39.262313899), (-7.935442597, 40.946726206), (-9.427650091, 42.415170203))
            ThreePointArc((-9.427650091, 42.415170203), (-9.942296285, 42.19431806), (-10.453342871, 41.965259636))
            ThreePointArc((-10.453342871, 41.965259636), (-10.383618147, 39.872856845), (-9.98641209, 37.817318393))
            ThreePointArc((-9.98641209, 37.817318393), (-10.666596371, 37.46002555), (-11.337735501, 37.086018733))
            ThreePointArc((-11.337735501, 37.086018733), (-12.841312267, 38.5428193), (-14.554865934, 39.745626354))
            ThreePointArc((-14.554865934, 39.745626354), (-15.026141957, 39.443078366), (-15.492516756, 39.133028497))
            ThreePointArc((-15.492516756, 39.133028497), (-15.079344806, 37.080639665), (-14.349225613, 35.118514046))
            ThreePointArc((-14.349225613, 35.118514046), (-14.961324598, 34.65413956), (-15.561750766, 34.174767838))
            ThreePointArc((-15.561750766, 34.174767838), (-17.284602196, 35.364218942), (-19.172760759, 36.268579612))
            ThreePointArc((-19.172760759, 36.268579612), (-19.587811429, 35.892588501), (-19.996792953, 35.510004539))
            ThreePointArc((-19.996792953, 35.510004539), (-19.251444031, 33.553613483), (-18.20832745, 31.73842237))
            ThreePointArc((-18.20832745, 31.73842237), (-18.735644674, 31.179633164), (-19.24897982, 30.607972549))
            ThreePointArc((-19.24897982, 30.607972549), (-21.144111019, 31.497629065), (-23.155370434, 32.078874749))
            ThreePointArc((-23.155370434, 32.078874749), (-23.502874251, 31.639696571), (-23.843306549, 31.19501441))
            ThreePointArc((-23.843306549, 31.19501441), (-22.786111831, 29.387986378), (-21.458451363, 27.769243452))
            ThreePointArc((-21.458451363, 27.769243452), (-21.886602987, 27.131281841), (-22.298844666, 26.482925743))
            ThreePointArc((-22.298844666, 26.482925743), (-24.314561396, 27.04852016), (-26.394059749, 27.290795991))
            ThreePointArc((-26.394059749, 27.290795991), (-26.664537715, 26.800410383), (-26.927134682, 26.305759792))
            ThreePointArc((-26.927134682, 26.305759792), (-25.586931683, 24.697385799), (-24.010942444, 23.319246148))
            ThreePointArc((-24.010942444, 23.319246148), (-24.328249608, 22.61951406), (-24.628152942, 21.912147944))
            ThreePointArc((-24.628152942, 21.912147944), (-26.709471704, 22.138252321), (-28.800485701, 22.034949647))
            ThreePointArc((-28.800485701, 22.034949647), (-28.986559882, 21.506733049), (-29.164158557, 20.975606807))
            ThreePointArc((-29.164158557, 20.975606807), (-27.577504522, 19.609759102), (-25.796175391, 18.509814783))
            ThreePointArc((-25.796175391, 18.509814783), (-25.993982783, 17.767399086), (-26.17336719, 17.020318056))
            ThreePointArc((-26.17336719, 17.020318056), (-28.263515034, 16.900764855), (-30.309007264, 16.454701502))
            ThreePointArc((-30.309007264, 16.454701502), (-30.405602041, 15.903062287), (-30.493357996, 15.349948133))
            ThreePointArc((-30.493357996, 15.349948133), (-28.703532711, 14.263883482), (-26.765453703, 13.472138107))
            ThreePointArc((-26.765453703, 13.472138107), (-26.838365652, 12.707289966), (-26.892337993, 11.940872445))
            ThreePointArc((-26.892337993, 11.940872445), (-28.934301135, 11.478922766), (-30.878475903, 10.70226618))
            ThreePointArc((-30.878475903, 10.70226618), (-30.882956422, 10.142251627), (-30.878475903, 9.582237074))
            ThreePointArc((-30.878475903, 9.582237074), (-28.934301135, 8.805580488), (-26.892337993, 8.343630809))
            ThreePointArc((-26.892337993, 8.343630809), (-26.838365652, 7.577213288), (-26.765453703, 6.812365147))
            ThreePointArc((-26.765453703, 6.812365147), (-28.703532711, 6.020619773), (-30.493357996, 4.934555121))
            ThreePointArc((-30.493357996, 4.934555121), (-30.405602041, 4.381440967), (-30.309007264, 3.829801752))
            ThreePointArc((-30.309007264, 3.829801752), (-28.263515034, 3.383738399), (-26.17336719, 3.264185198))
            ThreePointArc((-26.17336719, 3.264185198), (-25.993982783, 2.517104168), (-25.796175391, 1.774688472))
            ThreePointArc((-25.796175391, 1.774688472), (-27.577504522, 0.674744152), (-29.164158557, -0.691103553))
            ThreePointArc((-29.164158557, -0.691103553), (-28.986559882, -1.222229795), (-28.800485701, -1.750446392))
            ThreePointArc((-28.800485701, -1.750446392), (-26.709471704, -1.853749067), (-24.628152942, -1.62764469))
            ThreePointArc((-24.628152942, -1.62764469), (-24.328249608, -2.335010805), (-24.010942444, -3.034742893))
            ThreePointArc((-24.010942444, -3.034742893), (-25.586931683, -4.412882545), (-26.927134682, -6.021256538))
            ThreePointArc((-26.927134682, -6.021256538), (-26.664537715, -6.515907129), (-26.394059749, -7.006292737))
            ThreePointArc((-26.394059749, -7.006292737), (-24.314561396, -6.764016906), (-22.298844666, -6.198422489))
            ThreePointArc((-22.298844666, -6.198422489), (-21.886602987, -6.846778586), (-21.458451363, -7.484740198))
            ThreePointArc((-21.458451363, -7.484740198), (-22.786111831, -9.103483124), (-23.843306549, -10.910511155))
            ThreePointArc((-23.843306549, -10.910511155), (-23.502874251, -11.355193317), (-23.155370434, -11.794371494))
            ThreePointArc((-23.155370434, -11.794371494), (-21.144111019, -11.21312581), (-19.24897982, -10.323469295))
        make_face()
    extrude(amount=CUT_EXTRUDE1_DEPTH, mode=Mode.SUBTRACT)

    # Fillet1
    fillet1_edges = [part.edges().sort_by_distance(p)[0] for p in [
        (2.744127109, 24.055987178, -4.181405833),
    ]]
    fillet(fillet1_edges, radius=FILLET1_R)


solid = part.part
